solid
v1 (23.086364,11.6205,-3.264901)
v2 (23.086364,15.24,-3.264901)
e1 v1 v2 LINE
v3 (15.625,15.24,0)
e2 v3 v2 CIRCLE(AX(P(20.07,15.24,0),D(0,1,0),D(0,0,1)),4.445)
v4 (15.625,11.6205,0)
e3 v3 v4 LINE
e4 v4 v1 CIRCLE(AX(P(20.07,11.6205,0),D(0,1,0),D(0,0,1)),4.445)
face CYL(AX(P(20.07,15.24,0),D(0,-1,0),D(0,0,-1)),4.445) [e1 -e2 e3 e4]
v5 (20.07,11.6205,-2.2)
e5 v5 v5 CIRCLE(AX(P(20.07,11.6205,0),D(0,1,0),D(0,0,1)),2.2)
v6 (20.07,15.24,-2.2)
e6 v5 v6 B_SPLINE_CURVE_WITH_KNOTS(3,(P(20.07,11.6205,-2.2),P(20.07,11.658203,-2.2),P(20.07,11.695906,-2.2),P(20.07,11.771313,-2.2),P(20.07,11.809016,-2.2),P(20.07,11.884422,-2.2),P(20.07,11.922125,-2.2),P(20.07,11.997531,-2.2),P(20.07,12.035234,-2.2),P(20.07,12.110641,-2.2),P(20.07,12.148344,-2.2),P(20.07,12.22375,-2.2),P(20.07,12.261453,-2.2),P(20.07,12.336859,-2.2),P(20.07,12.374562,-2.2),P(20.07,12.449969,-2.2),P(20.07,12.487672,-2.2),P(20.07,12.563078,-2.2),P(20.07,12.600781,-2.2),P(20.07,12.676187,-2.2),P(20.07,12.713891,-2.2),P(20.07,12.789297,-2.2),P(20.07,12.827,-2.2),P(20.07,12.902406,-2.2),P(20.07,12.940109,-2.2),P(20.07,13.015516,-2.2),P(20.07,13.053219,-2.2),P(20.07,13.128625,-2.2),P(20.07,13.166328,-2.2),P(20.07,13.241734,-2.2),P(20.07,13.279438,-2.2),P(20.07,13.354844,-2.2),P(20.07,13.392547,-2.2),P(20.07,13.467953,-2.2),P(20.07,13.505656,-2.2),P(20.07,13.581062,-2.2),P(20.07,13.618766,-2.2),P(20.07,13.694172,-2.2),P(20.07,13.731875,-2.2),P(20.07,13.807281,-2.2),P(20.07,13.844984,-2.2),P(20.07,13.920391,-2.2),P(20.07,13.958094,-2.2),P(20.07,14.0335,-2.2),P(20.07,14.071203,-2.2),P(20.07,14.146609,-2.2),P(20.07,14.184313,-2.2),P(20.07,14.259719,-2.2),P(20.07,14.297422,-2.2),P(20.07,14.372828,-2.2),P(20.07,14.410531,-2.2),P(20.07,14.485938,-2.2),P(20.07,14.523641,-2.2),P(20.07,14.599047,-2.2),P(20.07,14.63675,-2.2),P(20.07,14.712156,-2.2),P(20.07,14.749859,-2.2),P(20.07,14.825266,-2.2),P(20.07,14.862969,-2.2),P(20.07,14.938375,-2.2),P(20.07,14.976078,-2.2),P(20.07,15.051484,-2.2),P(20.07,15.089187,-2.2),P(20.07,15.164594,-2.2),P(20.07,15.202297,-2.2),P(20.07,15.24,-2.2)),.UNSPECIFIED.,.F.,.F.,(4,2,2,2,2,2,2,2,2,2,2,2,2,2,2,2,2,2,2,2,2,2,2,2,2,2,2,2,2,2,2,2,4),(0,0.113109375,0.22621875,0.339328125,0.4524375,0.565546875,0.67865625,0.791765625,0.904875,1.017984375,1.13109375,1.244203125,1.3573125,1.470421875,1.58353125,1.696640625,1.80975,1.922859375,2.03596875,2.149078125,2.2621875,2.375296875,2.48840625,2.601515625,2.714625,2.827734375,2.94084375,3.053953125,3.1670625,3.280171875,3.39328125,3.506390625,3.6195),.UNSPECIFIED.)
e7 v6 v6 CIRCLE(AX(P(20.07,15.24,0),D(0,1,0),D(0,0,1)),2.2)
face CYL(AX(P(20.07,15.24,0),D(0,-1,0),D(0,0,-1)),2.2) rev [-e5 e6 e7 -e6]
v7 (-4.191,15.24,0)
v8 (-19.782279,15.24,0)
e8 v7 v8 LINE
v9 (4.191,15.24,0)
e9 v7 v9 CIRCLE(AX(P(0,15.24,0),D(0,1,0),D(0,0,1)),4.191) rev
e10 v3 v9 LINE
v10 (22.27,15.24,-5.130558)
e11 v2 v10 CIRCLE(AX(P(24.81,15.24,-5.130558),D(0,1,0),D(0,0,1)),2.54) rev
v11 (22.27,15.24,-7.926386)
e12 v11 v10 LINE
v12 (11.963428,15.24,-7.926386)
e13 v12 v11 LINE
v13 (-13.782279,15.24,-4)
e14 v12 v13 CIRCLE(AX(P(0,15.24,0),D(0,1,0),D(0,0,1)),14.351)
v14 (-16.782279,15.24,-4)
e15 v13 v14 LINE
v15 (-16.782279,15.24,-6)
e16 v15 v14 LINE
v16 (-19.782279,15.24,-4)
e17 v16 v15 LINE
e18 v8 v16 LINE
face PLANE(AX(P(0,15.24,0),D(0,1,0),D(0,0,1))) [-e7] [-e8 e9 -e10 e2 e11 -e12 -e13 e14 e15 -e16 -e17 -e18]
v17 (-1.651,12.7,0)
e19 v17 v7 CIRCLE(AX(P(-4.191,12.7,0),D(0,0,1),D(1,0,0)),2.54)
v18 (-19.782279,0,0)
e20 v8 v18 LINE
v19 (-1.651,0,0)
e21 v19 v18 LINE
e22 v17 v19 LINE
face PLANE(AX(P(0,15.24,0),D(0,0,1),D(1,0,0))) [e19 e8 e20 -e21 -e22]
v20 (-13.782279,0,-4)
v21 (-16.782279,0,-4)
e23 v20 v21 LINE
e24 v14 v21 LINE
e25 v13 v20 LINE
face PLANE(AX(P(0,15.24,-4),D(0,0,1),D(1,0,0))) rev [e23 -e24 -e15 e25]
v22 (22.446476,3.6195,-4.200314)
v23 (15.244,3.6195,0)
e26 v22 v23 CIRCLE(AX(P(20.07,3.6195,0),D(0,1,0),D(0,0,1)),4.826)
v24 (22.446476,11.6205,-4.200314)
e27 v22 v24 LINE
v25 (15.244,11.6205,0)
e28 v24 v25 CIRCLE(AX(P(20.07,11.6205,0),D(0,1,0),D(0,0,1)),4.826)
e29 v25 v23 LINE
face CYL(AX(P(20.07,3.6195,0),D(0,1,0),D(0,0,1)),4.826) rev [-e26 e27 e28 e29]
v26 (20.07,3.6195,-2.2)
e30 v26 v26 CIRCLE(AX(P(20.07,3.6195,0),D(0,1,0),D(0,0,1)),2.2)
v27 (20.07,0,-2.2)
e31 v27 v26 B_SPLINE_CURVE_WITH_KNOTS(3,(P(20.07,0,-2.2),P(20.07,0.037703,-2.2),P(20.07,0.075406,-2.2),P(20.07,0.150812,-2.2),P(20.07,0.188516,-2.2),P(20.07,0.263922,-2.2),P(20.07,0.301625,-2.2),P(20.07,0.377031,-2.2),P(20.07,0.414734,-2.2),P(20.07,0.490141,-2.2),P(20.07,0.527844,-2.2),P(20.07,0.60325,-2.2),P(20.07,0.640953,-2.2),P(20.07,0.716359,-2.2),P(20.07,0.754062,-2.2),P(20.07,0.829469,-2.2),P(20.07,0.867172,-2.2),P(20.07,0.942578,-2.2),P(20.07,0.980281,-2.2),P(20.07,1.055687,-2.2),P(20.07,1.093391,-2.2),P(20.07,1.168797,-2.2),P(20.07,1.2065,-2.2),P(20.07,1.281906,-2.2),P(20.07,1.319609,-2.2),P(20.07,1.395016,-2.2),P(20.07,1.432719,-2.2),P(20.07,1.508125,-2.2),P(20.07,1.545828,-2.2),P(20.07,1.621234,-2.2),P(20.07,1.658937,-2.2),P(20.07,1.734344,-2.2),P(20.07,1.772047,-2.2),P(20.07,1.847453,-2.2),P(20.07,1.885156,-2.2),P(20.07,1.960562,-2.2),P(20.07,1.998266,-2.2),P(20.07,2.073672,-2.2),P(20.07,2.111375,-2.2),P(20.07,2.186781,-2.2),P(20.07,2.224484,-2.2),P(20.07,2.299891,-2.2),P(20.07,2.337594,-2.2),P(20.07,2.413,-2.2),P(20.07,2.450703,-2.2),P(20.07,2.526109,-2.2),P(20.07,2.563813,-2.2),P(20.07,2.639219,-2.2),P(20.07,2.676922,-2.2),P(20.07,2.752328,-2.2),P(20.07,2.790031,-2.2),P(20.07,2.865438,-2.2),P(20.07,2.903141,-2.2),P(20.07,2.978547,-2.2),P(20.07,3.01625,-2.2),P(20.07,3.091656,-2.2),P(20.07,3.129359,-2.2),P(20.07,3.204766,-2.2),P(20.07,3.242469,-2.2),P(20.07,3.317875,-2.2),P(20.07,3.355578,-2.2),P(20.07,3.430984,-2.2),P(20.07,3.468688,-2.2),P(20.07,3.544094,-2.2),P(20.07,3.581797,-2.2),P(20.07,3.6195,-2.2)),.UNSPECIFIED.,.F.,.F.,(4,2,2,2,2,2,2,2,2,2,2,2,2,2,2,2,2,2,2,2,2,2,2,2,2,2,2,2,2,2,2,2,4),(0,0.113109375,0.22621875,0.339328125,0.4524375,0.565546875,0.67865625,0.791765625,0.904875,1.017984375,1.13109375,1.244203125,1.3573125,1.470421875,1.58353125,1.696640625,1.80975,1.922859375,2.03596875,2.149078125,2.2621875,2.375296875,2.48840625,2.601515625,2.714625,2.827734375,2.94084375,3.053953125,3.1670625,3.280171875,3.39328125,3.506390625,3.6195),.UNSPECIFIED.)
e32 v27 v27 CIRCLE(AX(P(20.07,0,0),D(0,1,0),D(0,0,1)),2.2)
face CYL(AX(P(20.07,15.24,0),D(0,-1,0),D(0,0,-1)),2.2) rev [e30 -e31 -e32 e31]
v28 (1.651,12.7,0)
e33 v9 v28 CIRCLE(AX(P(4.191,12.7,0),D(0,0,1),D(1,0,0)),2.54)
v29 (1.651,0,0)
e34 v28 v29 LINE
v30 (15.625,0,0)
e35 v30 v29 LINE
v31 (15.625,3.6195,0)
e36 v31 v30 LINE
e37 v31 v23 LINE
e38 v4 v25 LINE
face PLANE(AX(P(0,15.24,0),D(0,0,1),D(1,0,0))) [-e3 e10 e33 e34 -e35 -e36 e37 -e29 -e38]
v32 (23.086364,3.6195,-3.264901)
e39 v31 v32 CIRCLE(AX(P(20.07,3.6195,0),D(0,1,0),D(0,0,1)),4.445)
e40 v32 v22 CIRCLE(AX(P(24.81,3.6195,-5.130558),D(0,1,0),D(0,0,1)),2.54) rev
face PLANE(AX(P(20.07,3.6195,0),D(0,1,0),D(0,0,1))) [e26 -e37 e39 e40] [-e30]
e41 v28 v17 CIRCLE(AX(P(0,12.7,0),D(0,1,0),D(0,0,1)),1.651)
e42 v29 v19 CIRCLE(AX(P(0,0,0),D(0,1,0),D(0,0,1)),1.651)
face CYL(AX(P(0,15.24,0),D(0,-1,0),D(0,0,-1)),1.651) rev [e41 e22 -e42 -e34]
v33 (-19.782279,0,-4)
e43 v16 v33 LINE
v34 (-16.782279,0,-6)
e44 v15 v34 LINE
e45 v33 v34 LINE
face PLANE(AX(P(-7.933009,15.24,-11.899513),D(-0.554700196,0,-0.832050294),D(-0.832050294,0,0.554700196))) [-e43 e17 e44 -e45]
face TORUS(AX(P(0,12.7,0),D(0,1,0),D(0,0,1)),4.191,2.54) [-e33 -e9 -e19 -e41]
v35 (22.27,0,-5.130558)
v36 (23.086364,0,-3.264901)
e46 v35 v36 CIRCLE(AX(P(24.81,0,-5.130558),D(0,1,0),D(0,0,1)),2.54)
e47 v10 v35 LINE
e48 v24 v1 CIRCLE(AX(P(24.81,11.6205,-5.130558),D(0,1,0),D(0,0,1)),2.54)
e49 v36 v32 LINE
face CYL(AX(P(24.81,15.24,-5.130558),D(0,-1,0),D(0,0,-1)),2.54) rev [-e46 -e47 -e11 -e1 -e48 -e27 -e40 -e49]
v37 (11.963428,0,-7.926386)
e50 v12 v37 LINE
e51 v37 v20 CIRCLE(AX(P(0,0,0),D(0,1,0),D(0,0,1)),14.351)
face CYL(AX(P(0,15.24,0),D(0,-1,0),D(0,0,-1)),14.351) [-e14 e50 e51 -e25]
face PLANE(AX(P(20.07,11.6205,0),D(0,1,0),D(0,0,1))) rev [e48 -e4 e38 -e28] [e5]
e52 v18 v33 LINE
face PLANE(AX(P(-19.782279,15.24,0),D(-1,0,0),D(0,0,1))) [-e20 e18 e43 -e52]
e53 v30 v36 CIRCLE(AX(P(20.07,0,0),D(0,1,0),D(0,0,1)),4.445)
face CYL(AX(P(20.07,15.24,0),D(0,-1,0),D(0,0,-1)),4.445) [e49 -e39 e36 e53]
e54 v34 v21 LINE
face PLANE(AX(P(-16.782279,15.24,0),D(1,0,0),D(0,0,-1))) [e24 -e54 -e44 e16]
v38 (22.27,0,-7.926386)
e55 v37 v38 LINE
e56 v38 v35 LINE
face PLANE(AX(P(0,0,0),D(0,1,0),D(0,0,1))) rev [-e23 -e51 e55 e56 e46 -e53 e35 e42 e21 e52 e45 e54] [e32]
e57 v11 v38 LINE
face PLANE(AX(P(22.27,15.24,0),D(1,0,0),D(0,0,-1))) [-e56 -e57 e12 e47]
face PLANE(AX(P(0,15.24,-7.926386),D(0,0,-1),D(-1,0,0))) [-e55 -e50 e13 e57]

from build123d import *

# Parameters (mm, degrees)
SKETCH1_R           = 2.2
BOSS_EXTRUDE1_DEPTH = 15.24
SKETCH2_R           = 4.826
CUT_EXTRUDE1_DEPTH  = 4.0005
FILLET2_R           = 2.54
FILLET3_R           = 2.54


with BuildPart() as part:
    # Sketch1 → Boss-Extrude1 (new body)
    with BuildSketch(Plane(origin=(0, 0, 0), x_dir=(1, 0, 0), z_dir=(0, 1, 0))):
        with BuildLine():
            Line((-19.782278513, 0), (-13.782278513, 0))
            Line((-13.782278513, 0), (-1.651, 0))
            ThreePointArc((-1.651, 0), (0, 1.651), (1.651, 0))
            Line((1.651, 0), (15.625, 0))
            ThreePointArc((15.625, 0), (22.30372167, -3.84298224), (22.27, 3.862385921))
            Line((22.27, 3.862385921), (22.27, 7.926385921))
            Line((22.27, 7.926385921), (11.963427905, 7.926385921))
            ThreePointArc((11.963427905, 7.926385921), (6.7896847, 12.64323466), (0, 14.351))
            ThreePointArc((0, 14.351), (-8.618213301, 11.475086078), (-13.782278513, 4))
            Line((-13.782278513, 4), (-16.782278513, 4))
            Line((-16.782278513, 4), (-16.782278513, 6))
            Line((-16.782278513, 6), (-19.782278513, 4))
            Line((-19.782278513, 4), (-19.782278513, 0))
        make_face()
        with Locations(Location((20.07, 0, 0), (0, 0, 90))):
            Circle(SKETCH1_R, mode=Mode.SUBTRACT)
    extrude(amount=BOSS_EXTRUDE1_DEPTH)

    # Sketch2 → Cut-Extrude1 (cut, symmetric)
    with BuildSketch(Plane(origin=(0, 7.62, 0), x_dir=(1, 0, 0), z_dir=(0, 1, 0))):
        with Locations((20.07, 0)):
            Circle(SKETCH2_R)
    extrude(amount=CUT_EXTRUDE1_DEPTH, both=True, mode=Mode.SUBTRACT)

    # Fillet2
    fillet2_edges = [part.edges().sort_by_distance(p)[0] for p in [
        (0, 15.24, -1.651),
    ]]
    fillet(fillet2_edges, radius=FILLET2_R)

    # Fillet3
    # the kernel refuses this fillet: 2.54 mm, written as the material it adds along each edge
    with BuildSketch(Plane(origin=(22.27, 4.011467753, -3.862385921), x_dir=(0.8069614715901079, 0, 0.5906040834341796), z_dir=(0, 1, 0))) as fillet3_piece_1_section:
        with BuildLine():
            CenterArc((1.300694552, 2.523500349), FILLET3_R, 216.19988752, 47.265895784)
            Line((-0.748987586, 1.023365977), (-0.789981229, 0.993363289))
            Line((-0.789981229, 0.993363289), (-0.040993643, -0.030002687))
            Line((-0.040993643, -0.030002687), (0.005780865, -0.050470007))
            ThreePointArc((0.005780865, -0.050470007), (0.505825659, -0.02192561), (1.005870453, -0.050470007))
            Line((1.005870453, -0.050470007), (1.011651318, 0))
        make_face()
    fillet3_piece_1 = extrude(amount=11.228532247, mode=Mode.PRIVATE)
    fillet3_piece_1 = split(fillet3_piece_1, bisect_by=Plane(origin=(22.284641862, 11.6205, -4.588750924), z_dir=(0, -1, 0)), keep=Keep.TOP, mode=Mode.PRIVATE)
    fillet3_piece_1 = fillet3_piece_1 - Plane(origin=(20.07, 7.815983876, 0), x_dir=(1, 0, 0), z_dir=(0, 1, 0)) * Cylinder(4.826, 27, mode=Mode.PRIVATE)
    add(fillet3_piece_1)
    with BuildSketch(Plane(origin=(22.27, 11.6205, -3.862385921), x_dir=(0.8069614715901079, 0, 0.5906040834341796), z_dir=(0, 1, 0))) as fillet3_piece_2_section:
        with BuildLine():
            CenterArc((1.300694552, 2.523500349), FILLET3_R, 216.19988752, 47.265895784)
            Line((-0.748987586, 1.023365977), (-0.789981229, 0.993363289))
            Line((-0.789981229, 0.993363289), (-0.040993643, -0.030002687))
            Line((-0.040993643, -0.030002687), (0.005780865, -0.050470007))
            ThreePointArc((0.005780865, -0.050470007), (0.505825659, -0.02192561), (1.005870453, -0.050470007))
            Line((1.005870453, -0.050470007), (1.011651318, 0))
        make_face()
    fillet3_piece_2 = extrude(amount=3.6195, mode=Mode.PRIVATE)
    fillet3_piece_2 = fillet3_piece_2 & Plane(origin=(20.07, 13.43025, 0), x_dir=(1, 0, 0), z_dir=(0, 1, 0)) * Cylinder(4.826, 12, mode=Mode.PRIVATE)
    add(fillet3_piece_2)
    with BuildSketch(Plane(origin=(22.27, 11.6205, -3.862385921), x_dir=(0.8069614715901079, 0, 0.5906040834341796), z_dir=(0, 1, 0))) as fillet3_piece_3_section:
        with BuildLine():
            CenterArc((1.300694552, 2.523500349), FILLET3_R, 216.19988752, 47.265895784)
            Line((-0.748987586, 1.023365977), (-0.789981229, 0.993363289))
            Line((-0.789981229, 0.993363289), (-0.040993643, -0.030002687))
            Line((-0.040993643, -0.030002687), (0.005780865, -0.050470007))
            ThreePointArc((0.005780865, -0.050470007), (0.505825659, -0.02192561), (1.005870453, -0.050470007))
            Line((1.005870453, -0.050470007), (1.011651318, 0))
        make_face()
    fillet3_piece_3 = extrude(amount=3.6195, mode=Mode.PRIVATE)
    fillet3_piece_3 = fillet3_piece_3 - Plane(origin=(20.07, 13.43025, 0), x_dir=(1, 0, 0), z_dir=(0, 1, 0)) * Cylinder(4.826, 12, mode=Mode.PRIVATE)
    add(fillet3_piece_3)
    with BuildSketch(Plane(origin=(22.27, 0, -3.862385921), x_dir=(0, 0, -1), z_dir=(0, 1, 0))) as fillet3_piece_4_section:
        with BuildLine():
            CenterArc((1.268172041, -2.54), FILLET3_R, 90, 47.265895784)
            Line((-0.597485399, -0.816363636), (-0.634798548, -0.781890909))
            ThreePointArc((-0.634798548, -0.781890909), (-0.316435822, -0.395232463), (-0.044141553, 0.025142857))
            Line((-0.044141553, 0.025142857), (0, 0.0508))
            Line((0, 0.0508), (1.268172041, 0.0508))
            Line((1.268172041, 0.0508), (1.268172041, 0))
        make_face()
    fillet3_piece_4 = extrude(amount=3.6195, mode=Mode.PRIVATE)
    fillet3_piece_4 = fillet3_piece_4 - Plane(origin=(20.07, 1.80975, 0), x_dir=(1, 0, 0), z_dir=(0, 1, 0)) * Cylinder(4.826, 13, mode=Mode.PRIVATE)
    add(fillet3_piece_4)
    with BuildSketch(Plane(origin=(22.27, 0, -3.862385921), x_dir=(0, 0, -1), z_dir=(0, 1, 0))) as fillet3_piece_5_section:
        with BuildLine():
            CenterArc((1.268172041, -2.54), FILLET3_R, 90, 47.265895784)
            Line((-0.597485399, -0.816363636), (-0.634798548, -0.781890909))
            ThreePointArc((-0.634798548, -0.781890909), (-0.316435822, -0.395232463), (-0.044141553, 0.025142857))
            Line((-0.044141553, 0.025142857), (0, 0.0508))
            Line((0, 0.0508), (1.268172041, 0.0508))
            Line((1.268172041, 0.0508), (1.268172041, 0))
        make_face()
    fillet3_piece_5 = extrude(amount=3.6195, mode=Mode.PRIVATE)
    fillet3_piece_5 = fillet3_piece_5 & Plane(origin=(20.07, 1.80975, 0), x_dir=(1, 0, 0), z_dir=(0, 1, 0)) * Cylinder(4.826, 13, mode=Mode.PRIVATE)
    add(fillet3_piece_5)
    with BuildSketch(Plane(origin=(22.27, 0, -3.862385921), x_dir=(0, 0, -1), z_dir=(0, 1, 0))) as fillet3_piece_6_section:
        with BuildLine():
            CenterArc((1.268172041, -2.54), FILLET3_R, 90, 47.265895784)
            Line((-0.597485399, -0.816363636), (-0.634798548, -0.781890909))
            ThreePointArc((-0.634798548, -0.781890909), (-0.316435822, -0.395232463), (-0.044141553, 0.025142857))
            Line((-0.044141553, 0.025142857), (0, 0.0508))
            Line((0, 0.0508), (1.268172041, 0.0508))
            Line((1.268172041, 0.0508), (1.268172041, 0))
        make_face()
    fillet3_piece_6 = extrude(amount=11.228532247, mode=Mode.PRIVATE)
    fillet3_piece_6 = fillet3_piece_6 - Plane(origin=(20.07, 7.424016124, 0), x_dir=(1, 0, 0), z_dir=(0, 1, 0)) * Cylinder(4.826, 28, mode=Mode.PRIVATE)
    fillet3_piece_6 = split(fillet3_piece_6, bisect_by=Plane(origin=(22.284641862, 3.6195, -4.588750924), z_dir=(0, 1, 0)), keep=Keep.TOP, mode=Mode.PRIVATE)
    add(fillet3_piece_6)


solid = part.part
